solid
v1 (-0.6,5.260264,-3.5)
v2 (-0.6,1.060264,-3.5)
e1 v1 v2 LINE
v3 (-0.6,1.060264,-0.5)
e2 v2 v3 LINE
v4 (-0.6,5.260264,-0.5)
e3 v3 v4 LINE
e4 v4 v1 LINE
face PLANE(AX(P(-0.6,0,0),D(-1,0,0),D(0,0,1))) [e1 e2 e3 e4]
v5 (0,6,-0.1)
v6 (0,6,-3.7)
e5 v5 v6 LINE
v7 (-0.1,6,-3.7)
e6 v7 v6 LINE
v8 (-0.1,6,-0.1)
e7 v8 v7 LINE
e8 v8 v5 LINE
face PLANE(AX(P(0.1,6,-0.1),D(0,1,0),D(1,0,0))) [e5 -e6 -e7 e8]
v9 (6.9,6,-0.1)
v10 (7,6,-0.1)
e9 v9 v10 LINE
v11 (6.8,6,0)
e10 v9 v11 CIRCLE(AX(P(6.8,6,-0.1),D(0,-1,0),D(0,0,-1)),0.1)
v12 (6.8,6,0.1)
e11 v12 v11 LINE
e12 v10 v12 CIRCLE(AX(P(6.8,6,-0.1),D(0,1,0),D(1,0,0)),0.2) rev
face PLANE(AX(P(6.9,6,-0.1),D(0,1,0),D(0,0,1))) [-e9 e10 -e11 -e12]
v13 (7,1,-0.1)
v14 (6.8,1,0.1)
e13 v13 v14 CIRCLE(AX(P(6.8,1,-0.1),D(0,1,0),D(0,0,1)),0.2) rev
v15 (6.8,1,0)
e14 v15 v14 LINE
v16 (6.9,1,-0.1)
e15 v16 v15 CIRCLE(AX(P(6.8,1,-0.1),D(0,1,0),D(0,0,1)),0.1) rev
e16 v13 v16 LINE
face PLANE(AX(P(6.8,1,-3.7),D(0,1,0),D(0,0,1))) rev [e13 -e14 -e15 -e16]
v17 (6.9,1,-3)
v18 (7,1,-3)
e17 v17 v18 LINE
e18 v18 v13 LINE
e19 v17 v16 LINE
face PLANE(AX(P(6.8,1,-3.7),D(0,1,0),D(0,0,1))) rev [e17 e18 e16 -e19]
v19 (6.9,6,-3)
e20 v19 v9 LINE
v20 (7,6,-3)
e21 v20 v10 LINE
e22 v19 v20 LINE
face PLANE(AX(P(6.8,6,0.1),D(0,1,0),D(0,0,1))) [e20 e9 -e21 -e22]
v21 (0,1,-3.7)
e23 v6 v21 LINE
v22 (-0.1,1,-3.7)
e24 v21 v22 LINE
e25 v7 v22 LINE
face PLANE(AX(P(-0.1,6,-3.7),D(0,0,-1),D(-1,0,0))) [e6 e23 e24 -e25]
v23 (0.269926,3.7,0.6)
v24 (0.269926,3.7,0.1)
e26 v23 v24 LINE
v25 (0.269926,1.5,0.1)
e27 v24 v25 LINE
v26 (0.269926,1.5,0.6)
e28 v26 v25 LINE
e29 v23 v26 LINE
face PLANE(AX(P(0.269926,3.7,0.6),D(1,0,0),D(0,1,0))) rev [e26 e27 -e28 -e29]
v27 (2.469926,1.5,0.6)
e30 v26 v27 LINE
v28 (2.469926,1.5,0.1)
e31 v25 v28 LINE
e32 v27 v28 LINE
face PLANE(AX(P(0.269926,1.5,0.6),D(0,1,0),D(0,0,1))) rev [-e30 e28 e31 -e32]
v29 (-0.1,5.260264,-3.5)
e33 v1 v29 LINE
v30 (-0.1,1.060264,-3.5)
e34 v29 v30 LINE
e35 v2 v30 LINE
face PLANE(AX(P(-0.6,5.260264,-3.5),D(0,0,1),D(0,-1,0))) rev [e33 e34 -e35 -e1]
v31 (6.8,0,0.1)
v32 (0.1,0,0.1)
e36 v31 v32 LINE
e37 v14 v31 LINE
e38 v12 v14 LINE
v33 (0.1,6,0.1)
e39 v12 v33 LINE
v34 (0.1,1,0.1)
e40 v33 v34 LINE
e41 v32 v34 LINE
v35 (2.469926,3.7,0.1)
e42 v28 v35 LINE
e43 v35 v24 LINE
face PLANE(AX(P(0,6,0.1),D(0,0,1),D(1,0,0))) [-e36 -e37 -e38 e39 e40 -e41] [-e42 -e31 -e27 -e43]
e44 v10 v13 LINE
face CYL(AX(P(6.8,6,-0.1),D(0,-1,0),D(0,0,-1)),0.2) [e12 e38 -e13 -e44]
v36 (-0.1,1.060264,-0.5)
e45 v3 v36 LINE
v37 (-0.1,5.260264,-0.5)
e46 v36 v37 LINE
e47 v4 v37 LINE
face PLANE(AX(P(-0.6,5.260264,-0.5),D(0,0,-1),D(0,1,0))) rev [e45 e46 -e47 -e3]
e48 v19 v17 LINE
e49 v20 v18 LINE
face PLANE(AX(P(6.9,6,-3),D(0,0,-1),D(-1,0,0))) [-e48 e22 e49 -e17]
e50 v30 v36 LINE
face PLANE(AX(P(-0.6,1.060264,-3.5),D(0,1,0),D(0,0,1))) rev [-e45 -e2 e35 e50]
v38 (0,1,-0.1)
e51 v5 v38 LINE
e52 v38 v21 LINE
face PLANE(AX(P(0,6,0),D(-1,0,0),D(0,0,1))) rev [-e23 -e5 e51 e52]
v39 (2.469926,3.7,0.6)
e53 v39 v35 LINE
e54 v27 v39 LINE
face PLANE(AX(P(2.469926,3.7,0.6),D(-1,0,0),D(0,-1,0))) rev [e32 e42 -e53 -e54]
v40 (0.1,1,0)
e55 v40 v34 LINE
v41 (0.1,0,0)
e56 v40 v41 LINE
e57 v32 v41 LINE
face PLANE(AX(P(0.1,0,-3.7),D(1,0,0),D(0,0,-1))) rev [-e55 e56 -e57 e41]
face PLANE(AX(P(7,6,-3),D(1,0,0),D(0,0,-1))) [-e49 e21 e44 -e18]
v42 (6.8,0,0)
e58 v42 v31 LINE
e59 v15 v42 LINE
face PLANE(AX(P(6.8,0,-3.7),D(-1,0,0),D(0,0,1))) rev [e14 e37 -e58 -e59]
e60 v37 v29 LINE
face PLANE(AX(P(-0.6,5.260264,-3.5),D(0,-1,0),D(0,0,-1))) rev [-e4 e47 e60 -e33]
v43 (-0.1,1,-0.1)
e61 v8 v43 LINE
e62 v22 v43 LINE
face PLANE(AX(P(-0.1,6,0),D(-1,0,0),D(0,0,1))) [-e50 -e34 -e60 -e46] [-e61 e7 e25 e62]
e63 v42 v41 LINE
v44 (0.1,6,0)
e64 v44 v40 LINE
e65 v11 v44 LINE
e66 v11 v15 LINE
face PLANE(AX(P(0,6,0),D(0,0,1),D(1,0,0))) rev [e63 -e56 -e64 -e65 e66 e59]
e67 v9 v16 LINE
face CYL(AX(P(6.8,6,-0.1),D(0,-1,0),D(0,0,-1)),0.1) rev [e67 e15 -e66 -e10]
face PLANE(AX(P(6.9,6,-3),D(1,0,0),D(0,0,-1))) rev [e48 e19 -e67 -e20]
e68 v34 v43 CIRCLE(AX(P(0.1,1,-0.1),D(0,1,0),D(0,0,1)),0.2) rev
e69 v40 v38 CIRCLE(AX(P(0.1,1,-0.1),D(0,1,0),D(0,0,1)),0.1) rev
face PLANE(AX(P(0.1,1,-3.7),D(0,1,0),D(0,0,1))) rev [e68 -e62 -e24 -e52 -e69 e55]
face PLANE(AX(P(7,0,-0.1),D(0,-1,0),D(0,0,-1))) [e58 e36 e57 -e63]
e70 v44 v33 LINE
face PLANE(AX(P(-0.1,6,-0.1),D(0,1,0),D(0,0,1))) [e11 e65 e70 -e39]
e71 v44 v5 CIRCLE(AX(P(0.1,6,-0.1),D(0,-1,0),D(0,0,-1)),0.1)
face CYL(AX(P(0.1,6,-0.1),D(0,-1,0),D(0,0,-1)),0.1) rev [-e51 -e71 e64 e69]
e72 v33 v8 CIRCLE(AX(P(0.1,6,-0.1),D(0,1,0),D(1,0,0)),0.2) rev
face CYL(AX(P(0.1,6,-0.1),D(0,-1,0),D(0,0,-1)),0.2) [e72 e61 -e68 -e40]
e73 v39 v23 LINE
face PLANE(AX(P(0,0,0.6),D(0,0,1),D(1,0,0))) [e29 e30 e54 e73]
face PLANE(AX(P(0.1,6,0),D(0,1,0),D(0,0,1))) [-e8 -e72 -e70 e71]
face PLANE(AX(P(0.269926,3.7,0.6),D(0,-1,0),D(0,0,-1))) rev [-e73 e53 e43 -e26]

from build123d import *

# Parameters (mm, degrees)
BASE_FLANGE3_DEPTH  = 6
SKETCH14_W          = 0.2
SKETCH14_H          = 1
CUT_EXTRUDE1_DEPTH  = 10.97196069
SKETCH15_W          = 2.2
SKETCH15_H          = 2.2
BOSS_EXTRUDE1_DEPTH = 0.5
SKETCH16_W          = 3
SKETCH16_H          = 4.2
BOSS_EXTRUDE2_DEPTH = 0.5


# Sheet-metal steps are written as plain solids
with BuildPart() as part:
    # Sketch1 → Base-Flange3 (new body)
    with BuildSketch(Plane(origin=(0, 0, 0), x_dir=(1, 0, 0), z_dir=(0, 1, 0))):
        with BuildLine():
            Line((6.9, 3), (6.9, 0.1))
            ThreePointArc((6.9, 0.1), (6.870710678, 0.029289322), (6.8, 0))
            Line((6.8, 0), (0.1, 0))
            ThreePointArc((0.1, 0), (0.029289322, 0.029289322), (0, 0.1))
            Line((0, 0.1), (0, 3.7))
            Line((0, 3.7), (-0.1, 3.7))
            Line((-0.1, 3.7), (-0.1, 0.1))
            ThreePointArc((-0.1, 0.1), (-0.041421356, -0.041421356), (0.1, -0.1))
            Line((0.1, -0.1), (6.8, -0.1))
            ThreePointArc((6.8, -0.1), (6.941421356, -0.041421356), (7, 0.1))
            Line((7, 0.1), (7, 3))
            Line((7, 3), (6.9, 3))
        make_face()
    extrude(amount=BASE_FLANGE3_DEPTH)

    # Sketch14 → Cut-Extrude1 (cut, through all)
    with BuildSketch(Plane.XY.offset(0.1)):
        with Locations((0, 0.5)):
            Rectangle(SKETCH14_W, SKETCH14_H)
        with Locations((6.9, 0.5)):
            Rectangle(SKETCH14_W, SKETCH14_H)
    extrude(amount=-CUT_EXTRUDE1_DEPTH, mode=Mode.SUBTRACT)

    # Sketch15 → Boss-Extrude1 (add)
    with BuildSketch(Plane.XY.offset(0.1)):
        with Locations((1.369926131, 2.6)):
            Rectangle(SKETCH15_W, SKETCH15_H)
    extrude(amount=BOSS_EXTRUDE1_DEPTH)

    # Sketch16 → Boss-Extrude2 (add)
    with BuildSketch(Plane.ZY.offset(0.1)):
        with Locations((-2, 3.160264221)):
            Rectangle(SKETCH16_W, SKETCH16_H)
    extrude(amount=BOSS_EXTRUDE2_DEPTH)


solid = part.part
